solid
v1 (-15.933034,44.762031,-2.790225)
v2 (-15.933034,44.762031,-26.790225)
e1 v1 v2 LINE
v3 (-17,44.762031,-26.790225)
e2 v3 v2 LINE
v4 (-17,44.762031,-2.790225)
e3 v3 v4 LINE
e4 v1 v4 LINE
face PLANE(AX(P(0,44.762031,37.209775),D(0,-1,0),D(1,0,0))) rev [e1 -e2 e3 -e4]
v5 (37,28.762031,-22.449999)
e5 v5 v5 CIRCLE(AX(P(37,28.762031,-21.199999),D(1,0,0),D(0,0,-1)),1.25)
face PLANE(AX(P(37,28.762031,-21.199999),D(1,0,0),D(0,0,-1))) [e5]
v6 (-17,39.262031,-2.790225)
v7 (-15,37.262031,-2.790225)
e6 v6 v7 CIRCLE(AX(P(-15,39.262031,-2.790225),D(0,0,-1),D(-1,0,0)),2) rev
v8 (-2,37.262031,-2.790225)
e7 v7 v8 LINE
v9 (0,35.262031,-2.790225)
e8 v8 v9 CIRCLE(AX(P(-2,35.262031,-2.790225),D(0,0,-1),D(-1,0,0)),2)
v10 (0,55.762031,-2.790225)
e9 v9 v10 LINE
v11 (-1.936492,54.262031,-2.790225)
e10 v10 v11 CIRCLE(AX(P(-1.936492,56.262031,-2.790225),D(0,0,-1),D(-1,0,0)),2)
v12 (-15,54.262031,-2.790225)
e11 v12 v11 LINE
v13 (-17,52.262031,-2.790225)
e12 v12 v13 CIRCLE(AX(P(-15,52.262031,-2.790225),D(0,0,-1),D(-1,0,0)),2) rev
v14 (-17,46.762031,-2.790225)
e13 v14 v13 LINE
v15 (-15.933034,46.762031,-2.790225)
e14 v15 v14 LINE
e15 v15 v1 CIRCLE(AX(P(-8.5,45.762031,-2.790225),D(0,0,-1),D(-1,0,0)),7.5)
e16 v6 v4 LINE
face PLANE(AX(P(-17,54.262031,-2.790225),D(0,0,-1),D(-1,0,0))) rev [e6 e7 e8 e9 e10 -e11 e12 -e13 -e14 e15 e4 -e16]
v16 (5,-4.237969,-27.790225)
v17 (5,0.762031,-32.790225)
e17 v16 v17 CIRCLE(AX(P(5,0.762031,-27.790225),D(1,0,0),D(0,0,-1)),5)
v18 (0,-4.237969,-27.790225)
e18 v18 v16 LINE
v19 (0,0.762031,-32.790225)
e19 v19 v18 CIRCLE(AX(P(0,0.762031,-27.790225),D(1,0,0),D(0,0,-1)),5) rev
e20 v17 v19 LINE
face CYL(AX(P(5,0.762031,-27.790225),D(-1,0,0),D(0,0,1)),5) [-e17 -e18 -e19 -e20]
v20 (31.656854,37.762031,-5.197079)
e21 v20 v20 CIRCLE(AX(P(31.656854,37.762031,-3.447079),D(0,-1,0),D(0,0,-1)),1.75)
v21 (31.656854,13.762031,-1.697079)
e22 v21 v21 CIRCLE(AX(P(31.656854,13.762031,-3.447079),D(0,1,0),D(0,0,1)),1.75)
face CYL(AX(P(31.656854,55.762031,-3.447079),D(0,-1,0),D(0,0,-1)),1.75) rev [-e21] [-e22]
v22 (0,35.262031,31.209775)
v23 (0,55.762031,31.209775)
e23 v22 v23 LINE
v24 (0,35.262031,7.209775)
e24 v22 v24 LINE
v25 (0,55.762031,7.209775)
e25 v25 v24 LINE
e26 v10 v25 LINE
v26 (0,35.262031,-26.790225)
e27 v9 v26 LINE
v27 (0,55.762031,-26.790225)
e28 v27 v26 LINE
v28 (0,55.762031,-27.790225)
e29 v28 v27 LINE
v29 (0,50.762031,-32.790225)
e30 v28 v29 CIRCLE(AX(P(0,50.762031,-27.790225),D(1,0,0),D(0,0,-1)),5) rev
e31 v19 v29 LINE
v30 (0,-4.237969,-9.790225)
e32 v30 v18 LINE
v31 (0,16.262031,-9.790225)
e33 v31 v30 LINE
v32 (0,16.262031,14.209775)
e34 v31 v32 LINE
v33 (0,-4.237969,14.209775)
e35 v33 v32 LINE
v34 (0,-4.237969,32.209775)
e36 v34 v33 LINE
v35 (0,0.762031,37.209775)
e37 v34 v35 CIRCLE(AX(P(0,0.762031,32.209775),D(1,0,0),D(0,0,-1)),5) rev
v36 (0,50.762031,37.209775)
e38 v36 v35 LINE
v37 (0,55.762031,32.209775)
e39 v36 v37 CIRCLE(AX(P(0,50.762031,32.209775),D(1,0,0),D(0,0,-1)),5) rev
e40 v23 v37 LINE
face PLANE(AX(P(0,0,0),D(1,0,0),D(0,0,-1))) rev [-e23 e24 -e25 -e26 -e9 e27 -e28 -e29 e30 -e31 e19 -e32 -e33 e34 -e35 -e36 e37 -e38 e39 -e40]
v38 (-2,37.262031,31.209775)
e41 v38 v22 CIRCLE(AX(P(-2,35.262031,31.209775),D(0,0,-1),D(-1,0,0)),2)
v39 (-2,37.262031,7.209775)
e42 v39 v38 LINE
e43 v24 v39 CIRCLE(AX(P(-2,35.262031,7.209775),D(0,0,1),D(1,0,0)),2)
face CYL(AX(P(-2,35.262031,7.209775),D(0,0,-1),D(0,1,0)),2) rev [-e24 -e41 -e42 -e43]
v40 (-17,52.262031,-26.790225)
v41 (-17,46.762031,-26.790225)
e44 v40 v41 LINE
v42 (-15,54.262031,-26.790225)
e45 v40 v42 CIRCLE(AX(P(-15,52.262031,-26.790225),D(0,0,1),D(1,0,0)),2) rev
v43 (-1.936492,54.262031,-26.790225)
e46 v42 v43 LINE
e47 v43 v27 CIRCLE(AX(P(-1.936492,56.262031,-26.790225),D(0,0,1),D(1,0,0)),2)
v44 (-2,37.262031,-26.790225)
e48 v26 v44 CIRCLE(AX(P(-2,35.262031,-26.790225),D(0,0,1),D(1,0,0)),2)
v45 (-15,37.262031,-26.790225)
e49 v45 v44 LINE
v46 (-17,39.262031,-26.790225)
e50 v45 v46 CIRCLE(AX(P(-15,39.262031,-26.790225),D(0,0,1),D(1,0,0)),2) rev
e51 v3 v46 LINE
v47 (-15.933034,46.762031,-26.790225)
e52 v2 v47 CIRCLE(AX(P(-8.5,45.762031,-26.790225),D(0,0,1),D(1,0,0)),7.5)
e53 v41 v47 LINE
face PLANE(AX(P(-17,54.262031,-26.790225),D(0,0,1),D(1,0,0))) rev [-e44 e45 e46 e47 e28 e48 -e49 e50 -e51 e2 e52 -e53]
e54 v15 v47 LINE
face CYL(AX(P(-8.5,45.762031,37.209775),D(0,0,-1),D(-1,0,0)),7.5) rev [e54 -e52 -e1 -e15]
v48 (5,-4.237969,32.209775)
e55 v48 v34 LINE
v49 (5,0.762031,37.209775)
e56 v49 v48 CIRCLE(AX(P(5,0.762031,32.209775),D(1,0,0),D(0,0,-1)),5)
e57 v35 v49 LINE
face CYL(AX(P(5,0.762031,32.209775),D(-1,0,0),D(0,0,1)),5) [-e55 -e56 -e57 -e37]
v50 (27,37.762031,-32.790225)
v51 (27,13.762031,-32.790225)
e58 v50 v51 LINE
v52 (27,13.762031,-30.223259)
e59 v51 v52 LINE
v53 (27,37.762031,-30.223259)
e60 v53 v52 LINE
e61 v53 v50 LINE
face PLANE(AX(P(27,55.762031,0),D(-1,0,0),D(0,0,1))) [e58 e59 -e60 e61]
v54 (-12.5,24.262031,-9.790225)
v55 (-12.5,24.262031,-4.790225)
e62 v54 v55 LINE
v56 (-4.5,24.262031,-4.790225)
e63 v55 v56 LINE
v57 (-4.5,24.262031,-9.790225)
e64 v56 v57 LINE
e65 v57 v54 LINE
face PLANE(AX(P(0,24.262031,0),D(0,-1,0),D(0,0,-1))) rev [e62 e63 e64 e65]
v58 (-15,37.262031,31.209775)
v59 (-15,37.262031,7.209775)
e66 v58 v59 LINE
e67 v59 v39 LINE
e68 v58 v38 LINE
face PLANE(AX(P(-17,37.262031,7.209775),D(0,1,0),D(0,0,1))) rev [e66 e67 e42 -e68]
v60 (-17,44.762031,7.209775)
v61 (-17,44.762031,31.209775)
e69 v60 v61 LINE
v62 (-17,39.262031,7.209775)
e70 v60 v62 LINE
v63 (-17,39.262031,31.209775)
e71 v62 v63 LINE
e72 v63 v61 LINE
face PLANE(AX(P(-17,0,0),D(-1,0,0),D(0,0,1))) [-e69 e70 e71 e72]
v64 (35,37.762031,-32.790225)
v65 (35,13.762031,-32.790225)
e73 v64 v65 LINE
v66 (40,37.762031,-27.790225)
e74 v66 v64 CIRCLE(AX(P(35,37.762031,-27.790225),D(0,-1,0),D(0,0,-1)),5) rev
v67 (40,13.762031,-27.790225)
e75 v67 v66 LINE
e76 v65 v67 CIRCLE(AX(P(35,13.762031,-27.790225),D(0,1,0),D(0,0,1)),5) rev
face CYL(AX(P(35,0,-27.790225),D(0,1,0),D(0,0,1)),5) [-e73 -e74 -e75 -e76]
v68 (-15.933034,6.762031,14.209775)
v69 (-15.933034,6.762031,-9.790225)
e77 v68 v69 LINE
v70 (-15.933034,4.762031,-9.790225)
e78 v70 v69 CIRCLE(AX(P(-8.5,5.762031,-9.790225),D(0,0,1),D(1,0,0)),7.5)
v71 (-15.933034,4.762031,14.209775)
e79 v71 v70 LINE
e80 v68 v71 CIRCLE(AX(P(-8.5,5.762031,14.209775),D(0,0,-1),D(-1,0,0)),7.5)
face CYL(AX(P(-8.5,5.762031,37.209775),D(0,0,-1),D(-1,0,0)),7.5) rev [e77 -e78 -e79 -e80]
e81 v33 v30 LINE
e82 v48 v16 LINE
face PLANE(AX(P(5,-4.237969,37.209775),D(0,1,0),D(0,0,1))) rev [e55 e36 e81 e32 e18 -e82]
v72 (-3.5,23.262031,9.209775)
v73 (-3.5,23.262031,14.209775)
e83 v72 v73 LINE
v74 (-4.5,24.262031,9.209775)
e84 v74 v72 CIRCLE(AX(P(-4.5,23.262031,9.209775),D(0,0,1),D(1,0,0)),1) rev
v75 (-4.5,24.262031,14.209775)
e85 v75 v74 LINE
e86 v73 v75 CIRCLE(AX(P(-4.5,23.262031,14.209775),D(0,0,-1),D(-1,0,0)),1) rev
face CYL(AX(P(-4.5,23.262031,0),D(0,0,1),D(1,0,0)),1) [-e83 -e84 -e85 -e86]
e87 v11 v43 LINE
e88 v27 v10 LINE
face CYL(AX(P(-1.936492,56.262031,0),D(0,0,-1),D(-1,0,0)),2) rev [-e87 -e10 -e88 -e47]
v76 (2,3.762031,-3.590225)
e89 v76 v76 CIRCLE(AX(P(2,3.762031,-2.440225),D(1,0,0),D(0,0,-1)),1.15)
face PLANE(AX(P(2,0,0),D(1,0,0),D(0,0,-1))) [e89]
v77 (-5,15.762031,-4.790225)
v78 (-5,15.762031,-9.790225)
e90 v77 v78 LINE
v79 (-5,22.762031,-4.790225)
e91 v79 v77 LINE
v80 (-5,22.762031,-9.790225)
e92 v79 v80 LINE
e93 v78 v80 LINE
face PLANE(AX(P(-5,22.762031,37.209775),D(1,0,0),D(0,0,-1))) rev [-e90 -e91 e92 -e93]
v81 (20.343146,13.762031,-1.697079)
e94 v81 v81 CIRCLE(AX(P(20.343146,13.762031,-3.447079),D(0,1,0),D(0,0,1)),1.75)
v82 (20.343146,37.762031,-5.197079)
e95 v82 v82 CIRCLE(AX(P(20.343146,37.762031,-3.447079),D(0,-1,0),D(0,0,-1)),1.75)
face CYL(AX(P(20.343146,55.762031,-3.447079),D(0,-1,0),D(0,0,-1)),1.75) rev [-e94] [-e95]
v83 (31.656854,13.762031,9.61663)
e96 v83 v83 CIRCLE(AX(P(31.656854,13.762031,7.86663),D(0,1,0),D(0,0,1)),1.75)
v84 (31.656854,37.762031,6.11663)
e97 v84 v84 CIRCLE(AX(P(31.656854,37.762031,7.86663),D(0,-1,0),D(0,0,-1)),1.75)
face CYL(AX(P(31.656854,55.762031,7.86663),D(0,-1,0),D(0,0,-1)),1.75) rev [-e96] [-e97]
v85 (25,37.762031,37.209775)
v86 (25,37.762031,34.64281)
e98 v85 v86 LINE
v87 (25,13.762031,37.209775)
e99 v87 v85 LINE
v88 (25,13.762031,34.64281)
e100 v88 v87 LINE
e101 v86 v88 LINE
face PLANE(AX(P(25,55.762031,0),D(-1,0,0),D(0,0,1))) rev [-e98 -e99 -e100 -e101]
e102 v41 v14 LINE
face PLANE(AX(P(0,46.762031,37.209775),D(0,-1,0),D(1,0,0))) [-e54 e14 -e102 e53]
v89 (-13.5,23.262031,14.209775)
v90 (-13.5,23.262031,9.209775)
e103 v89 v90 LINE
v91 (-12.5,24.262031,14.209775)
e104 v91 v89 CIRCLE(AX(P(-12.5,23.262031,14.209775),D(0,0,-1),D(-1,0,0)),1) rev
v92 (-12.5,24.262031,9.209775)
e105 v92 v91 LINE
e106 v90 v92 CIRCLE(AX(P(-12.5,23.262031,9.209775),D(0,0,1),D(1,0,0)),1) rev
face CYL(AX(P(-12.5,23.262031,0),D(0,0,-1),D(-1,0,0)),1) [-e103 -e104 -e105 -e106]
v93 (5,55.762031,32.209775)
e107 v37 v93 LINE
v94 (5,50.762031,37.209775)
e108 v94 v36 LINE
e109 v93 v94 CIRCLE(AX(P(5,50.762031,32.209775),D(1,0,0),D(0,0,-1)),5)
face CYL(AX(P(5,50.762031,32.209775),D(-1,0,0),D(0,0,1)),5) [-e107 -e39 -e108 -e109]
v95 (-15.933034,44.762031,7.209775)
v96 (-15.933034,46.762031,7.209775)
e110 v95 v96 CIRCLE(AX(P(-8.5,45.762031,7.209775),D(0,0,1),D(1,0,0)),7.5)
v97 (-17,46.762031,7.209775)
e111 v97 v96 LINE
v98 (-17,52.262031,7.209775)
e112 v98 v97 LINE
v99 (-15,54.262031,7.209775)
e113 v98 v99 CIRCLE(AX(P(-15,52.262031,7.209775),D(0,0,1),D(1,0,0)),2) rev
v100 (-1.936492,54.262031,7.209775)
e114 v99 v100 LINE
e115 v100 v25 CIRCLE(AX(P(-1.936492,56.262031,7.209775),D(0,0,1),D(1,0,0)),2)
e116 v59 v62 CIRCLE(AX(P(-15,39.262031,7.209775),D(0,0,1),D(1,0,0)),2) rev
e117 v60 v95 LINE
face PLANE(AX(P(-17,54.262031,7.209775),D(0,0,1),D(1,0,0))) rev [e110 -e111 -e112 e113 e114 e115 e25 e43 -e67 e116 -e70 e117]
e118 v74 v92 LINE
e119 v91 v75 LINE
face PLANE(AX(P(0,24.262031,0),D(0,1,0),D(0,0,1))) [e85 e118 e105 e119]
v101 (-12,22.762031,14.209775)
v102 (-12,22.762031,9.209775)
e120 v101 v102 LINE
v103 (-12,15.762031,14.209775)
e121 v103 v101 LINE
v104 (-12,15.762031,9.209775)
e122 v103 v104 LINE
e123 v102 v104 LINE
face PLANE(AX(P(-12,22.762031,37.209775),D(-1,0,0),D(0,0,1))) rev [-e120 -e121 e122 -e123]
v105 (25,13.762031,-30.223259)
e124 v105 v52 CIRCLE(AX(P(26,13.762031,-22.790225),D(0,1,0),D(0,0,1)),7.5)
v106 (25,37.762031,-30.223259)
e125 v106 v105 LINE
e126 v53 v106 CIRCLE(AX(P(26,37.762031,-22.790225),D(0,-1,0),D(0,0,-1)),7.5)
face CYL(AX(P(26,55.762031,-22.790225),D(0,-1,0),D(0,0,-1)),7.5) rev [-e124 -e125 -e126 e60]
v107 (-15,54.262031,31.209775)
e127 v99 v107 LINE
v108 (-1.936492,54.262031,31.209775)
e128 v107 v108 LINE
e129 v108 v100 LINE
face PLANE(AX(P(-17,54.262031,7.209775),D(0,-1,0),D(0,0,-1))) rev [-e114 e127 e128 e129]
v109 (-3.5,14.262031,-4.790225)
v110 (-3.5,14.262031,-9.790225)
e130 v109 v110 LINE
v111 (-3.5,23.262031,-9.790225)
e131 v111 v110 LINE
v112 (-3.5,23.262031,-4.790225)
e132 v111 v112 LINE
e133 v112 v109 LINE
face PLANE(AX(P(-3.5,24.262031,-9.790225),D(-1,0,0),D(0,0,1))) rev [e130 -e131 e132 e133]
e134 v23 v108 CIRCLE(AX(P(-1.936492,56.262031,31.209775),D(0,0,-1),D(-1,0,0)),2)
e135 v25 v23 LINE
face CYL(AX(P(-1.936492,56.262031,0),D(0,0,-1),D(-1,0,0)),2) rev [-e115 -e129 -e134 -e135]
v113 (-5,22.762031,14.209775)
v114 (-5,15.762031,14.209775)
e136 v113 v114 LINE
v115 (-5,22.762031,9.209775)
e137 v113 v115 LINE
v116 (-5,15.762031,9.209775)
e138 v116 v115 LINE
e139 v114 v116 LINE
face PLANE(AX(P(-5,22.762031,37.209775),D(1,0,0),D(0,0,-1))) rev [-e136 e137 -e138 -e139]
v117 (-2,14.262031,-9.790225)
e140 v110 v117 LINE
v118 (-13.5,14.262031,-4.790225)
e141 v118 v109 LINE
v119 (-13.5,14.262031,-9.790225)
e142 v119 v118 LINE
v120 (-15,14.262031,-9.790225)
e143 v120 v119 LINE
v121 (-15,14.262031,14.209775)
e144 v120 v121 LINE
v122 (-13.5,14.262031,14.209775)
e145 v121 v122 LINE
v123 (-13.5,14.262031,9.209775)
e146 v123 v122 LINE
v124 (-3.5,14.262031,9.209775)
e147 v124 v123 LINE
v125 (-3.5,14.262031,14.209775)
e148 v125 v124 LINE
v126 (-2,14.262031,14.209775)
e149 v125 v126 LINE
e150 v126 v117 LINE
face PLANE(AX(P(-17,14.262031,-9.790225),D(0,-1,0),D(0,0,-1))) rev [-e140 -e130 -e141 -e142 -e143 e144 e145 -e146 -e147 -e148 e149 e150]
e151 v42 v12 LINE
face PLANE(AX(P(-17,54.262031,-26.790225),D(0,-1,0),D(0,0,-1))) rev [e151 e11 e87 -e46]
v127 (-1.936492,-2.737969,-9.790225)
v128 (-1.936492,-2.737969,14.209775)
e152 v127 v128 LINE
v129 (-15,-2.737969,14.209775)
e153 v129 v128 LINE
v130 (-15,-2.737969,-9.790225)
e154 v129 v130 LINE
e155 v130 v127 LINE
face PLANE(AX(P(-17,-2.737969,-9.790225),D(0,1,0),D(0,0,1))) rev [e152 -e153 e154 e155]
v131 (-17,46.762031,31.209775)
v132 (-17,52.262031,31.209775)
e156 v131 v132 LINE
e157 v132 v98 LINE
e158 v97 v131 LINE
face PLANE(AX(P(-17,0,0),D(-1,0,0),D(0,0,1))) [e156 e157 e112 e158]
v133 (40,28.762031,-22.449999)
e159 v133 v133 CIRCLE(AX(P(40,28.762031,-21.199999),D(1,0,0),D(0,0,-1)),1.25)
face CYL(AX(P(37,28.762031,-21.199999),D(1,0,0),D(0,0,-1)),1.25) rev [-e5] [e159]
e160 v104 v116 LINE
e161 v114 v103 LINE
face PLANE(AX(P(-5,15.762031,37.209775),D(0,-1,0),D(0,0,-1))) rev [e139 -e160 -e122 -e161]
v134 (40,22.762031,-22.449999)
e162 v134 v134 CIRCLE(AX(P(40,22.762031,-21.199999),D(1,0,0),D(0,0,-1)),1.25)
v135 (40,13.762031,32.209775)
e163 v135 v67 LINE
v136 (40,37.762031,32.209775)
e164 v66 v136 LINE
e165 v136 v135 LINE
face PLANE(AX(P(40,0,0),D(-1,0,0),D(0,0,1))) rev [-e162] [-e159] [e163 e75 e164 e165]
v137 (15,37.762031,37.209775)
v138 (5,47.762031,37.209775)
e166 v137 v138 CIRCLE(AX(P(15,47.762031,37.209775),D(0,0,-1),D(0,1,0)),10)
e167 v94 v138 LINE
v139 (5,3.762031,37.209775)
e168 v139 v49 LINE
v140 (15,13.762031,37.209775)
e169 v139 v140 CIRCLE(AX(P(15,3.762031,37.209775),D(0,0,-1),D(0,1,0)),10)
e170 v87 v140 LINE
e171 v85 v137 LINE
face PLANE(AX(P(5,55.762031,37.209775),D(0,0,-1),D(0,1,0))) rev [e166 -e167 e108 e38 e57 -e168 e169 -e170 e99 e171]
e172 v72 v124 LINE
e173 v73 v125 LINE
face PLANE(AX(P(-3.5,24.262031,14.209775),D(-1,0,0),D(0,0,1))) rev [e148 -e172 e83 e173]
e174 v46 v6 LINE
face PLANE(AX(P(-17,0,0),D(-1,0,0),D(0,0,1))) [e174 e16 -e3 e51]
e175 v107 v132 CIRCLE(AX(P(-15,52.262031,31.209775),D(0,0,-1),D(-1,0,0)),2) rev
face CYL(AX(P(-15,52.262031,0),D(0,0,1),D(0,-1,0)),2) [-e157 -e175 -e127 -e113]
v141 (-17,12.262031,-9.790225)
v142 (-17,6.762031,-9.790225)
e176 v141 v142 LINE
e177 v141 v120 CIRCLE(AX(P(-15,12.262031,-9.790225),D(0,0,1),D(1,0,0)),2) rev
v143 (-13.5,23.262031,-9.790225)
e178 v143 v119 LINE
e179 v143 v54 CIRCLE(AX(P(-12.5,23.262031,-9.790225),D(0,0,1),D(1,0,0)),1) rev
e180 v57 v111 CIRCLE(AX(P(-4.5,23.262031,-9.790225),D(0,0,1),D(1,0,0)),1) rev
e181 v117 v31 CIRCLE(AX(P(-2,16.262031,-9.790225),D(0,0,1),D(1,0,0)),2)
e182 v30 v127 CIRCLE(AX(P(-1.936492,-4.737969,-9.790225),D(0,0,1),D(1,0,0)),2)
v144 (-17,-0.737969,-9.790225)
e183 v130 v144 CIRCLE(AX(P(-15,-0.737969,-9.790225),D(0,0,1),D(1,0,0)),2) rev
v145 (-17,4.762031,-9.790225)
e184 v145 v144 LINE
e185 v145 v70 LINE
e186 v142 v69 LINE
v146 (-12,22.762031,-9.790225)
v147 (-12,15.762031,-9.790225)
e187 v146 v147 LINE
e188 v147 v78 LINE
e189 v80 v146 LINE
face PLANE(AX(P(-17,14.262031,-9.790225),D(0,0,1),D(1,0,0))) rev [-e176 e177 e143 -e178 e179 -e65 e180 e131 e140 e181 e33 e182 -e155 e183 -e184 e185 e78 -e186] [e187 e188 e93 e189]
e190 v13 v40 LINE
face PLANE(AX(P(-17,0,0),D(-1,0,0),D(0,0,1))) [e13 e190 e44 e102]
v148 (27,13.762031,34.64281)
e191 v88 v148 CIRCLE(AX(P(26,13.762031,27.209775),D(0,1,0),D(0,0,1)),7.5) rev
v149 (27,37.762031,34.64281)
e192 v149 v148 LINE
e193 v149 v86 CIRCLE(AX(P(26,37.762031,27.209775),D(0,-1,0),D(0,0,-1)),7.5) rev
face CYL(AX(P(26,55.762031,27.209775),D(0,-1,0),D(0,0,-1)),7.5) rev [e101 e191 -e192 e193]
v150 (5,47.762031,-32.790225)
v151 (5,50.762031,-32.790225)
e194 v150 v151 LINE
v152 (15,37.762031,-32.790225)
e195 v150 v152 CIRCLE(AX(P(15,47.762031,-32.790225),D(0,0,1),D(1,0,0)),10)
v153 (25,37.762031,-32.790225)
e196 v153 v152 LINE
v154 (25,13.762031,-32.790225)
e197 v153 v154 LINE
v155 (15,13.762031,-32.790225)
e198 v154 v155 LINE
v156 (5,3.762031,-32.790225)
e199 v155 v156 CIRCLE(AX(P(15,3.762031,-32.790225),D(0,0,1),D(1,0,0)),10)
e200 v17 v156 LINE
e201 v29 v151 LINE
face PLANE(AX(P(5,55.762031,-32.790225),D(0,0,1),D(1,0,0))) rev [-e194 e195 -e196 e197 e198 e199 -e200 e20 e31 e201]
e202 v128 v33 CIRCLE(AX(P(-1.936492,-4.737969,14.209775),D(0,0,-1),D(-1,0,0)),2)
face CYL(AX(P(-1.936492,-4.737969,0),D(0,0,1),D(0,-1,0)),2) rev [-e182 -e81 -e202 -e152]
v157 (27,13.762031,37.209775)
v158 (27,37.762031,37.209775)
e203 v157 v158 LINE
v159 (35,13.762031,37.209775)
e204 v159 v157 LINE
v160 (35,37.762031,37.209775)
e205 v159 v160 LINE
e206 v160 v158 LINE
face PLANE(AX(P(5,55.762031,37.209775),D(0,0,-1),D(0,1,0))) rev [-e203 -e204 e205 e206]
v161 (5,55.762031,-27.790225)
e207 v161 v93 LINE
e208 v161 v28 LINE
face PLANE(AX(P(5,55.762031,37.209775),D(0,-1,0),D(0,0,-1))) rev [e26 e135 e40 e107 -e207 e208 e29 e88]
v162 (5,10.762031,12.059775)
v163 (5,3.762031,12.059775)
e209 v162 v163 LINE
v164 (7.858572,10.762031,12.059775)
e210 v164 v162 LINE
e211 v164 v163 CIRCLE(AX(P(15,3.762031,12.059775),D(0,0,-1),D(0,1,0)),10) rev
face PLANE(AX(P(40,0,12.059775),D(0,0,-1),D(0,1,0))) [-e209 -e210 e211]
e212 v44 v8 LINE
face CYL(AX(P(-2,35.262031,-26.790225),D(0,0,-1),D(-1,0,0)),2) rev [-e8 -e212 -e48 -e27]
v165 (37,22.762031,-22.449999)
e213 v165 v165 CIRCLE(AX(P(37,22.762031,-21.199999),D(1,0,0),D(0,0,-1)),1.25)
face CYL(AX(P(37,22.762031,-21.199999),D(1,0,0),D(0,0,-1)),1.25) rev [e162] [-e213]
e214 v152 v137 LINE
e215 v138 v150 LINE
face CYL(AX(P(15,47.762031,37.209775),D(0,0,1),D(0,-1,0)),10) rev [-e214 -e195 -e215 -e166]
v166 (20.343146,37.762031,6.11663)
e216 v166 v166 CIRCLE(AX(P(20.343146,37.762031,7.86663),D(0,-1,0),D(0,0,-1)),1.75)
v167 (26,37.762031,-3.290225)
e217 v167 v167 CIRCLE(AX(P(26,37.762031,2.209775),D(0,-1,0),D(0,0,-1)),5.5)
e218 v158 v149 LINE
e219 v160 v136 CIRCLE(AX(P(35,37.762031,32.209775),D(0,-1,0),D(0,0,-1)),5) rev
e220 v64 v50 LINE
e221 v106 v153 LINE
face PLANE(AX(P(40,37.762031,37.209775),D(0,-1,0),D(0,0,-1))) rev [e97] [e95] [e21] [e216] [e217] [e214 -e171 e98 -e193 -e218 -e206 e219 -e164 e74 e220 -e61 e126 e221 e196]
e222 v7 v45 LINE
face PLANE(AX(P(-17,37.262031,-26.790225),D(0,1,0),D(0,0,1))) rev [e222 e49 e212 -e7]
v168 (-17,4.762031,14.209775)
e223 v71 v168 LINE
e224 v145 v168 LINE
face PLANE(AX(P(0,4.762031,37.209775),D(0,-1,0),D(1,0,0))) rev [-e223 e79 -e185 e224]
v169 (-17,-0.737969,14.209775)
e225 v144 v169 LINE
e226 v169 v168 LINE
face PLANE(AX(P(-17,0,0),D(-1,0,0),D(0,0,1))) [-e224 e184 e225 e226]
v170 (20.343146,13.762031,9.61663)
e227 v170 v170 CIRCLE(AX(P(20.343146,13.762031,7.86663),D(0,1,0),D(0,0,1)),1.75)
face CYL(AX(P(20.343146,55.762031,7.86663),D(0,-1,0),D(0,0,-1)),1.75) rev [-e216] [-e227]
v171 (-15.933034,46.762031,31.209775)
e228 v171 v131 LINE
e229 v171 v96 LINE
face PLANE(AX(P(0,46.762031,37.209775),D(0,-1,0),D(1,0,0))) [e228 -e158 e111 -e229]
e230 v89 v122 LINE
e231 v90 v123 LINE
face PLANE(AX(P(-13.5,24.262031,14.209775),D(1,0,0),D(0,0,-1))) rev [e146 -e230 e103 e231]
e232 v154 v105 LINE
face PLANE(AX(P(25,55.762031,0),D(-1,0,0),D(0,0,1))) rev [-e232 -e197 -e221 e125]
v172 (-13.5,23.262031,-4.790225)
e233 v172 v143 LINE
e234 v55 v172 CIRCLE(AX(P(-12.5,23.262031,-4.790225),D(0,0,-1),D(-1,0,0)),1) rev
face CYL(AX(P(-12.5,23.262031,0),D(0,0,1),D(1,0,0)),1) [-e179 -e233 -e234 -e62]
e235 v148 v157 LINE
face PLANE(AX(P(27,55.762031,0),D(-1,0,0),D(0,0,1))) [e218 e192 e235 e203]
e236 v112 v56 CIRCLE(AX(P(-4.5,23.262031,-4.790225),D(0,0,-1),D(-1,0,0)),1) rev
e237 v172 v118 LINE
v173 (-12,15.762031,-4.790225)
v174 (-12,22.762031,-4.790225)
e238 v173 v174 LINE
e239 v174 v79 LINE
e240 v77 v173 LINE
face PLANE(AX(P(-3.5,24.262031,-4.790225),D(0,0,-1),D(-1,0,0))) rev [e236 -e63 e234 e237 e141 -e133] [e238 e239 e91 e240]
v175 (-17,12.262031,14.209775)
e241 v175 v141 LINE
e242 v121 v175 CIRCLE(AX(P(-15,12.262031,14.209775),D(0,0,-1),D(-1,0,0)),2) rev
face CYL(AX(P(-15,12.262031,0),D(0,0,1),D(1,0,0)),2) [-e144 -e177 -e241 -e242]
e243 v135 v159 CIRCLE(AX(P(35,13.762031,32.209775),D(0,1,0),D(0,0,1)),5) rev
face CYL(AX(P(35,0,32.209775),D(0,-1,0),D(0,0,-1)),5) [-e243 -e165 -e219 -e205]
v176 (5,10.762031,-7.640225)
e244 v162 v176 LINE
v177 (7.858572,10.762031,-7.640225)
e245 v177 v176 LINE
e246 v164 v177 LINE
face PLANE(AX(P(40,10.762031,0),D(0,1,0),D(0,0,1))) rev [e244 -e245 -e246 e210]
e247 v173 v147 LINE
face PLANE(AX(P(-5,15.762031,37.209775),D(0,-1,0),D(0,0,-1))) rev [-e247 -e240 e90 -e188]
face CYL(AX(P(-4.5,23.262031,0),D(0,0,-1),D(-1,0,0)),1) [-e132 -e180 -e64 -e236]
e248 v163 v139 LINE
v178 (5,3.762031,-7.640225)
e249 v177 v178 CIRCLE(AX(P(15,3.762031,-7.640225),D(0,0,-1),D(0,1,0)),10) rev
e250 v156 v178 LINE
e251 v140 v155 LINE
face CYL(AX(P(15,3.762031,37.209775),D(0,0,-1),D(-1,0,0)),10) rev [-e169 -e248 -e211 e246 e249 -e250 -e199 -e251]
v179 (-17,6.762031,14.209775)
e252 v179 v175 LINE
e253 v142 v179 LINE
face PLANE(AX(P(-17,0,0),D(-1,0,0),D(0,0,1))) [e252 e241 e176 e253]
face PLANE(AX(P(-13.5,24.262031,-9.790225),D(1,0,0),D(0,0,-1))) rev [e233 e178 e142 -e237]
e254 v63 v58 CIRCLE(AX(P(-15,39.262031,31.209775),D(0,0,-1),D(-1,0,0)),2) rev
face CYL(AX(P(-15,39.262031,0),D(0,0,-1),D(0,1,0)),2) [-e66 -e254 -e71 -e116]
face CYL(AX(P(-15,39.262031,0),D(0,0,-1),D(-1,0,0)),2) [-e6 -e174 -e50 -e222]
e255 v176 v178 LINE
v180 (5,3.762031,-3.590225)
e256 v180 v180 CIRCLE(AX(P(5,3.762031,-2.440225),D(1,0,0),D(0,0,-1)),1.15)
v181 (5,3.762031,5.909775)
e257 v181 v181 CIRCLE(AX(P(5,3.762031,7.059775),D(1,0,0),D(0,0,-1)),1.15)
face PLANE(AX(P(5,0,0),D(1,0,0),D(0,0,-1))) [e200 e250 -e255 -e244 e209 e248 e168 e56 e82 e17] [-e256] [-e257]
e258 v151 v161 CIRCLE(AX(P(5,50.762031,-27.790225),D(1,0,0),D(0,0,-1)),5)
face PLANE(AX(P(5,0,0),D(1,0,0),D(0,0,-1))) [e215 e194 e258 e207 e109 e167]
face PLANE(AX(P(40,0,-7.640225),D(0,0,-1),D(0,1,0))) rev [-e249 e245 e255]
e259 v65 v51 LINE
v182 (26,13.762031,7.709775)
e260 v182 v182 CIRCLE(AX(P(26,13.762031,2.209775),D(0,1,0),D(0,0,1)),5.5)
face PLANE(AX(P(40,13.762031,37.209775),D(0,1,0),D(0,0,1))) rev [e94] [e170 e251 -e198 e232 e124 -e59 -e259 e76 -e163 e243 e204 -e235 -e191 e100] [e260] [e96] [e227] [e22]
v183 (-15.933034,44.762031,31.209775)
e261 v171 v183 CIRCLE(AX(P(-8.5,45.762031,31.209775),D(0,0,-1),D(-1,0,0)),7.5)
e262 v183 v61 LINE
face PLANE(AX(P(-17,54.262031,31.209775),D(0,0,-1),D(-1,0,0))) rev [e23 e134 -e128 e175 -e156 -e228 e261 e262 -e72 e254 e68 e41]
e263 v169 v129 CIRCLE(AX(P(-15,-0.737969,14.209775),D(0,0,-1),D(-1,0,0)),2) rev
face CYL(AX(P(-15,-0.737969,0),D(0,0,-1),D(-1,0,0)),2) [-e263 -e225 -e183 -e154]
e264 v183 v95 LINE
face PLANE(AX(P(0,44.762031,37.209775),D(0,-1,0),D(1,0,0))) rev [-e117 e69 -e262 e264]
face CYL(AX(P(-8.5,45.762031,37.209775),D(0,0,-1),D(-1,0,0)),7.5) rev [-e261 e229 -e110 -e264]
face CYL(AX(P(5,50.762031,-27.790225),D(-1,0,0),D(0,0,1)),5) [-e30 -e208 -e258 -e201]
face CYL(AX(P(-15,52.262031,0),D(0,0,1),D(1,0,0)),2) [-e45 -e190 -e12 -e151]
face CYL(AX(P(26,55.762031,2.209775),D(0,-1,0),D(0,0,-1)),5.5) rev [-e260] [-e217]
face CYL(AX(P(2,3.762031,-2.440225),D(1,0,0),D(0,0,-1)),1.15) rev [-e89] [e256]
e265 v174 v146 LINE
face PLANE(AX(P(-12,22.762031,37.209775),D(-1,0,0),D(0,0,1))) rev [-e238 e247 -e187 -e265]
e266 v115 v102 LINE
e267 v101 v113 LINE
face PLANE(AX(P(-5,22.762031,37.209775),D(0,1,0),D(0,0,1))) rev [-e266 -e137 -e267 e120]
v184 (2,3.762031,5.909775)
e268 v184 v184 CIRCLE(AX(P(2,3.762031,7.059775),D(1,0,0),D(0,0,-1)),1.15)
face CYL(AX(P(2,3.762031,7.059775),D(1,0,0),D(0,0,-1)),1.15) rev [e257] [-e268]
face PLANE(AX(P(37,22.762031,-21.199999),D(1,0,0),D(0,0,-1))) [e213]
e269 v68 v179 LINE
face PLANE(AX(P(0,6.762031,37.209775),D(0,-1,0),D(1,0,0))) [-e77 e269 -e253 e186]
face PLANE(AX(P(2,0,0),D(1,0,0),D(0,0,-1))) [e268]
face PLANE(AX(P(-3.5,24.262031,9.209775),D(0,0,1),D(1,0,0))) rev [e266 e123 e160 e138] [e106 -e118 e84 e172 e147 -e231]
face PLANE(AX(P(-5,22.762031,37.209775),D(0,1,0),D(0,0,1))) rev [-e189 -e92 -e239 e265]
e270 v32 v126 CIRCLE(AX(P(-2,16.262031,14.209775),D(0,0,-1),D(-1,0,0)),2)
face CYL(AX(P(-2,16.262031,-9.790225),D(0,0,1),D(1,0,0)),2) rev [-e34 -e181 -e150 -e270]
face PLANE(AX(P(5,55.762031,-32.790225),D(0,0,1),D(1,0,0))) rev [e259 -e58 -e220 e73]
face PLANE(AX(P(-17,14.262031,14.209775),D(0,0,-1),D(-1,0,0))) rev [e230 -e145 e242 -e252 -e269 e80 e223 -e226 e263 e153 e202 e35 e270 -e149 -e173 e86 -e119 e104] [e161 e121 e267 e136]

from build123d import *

# Parameters (mm, degrees)
SKETCH1_W               = 70
SKETCH1_H               = 60
BOSS_EXTRUDE3_DEPTH     = 5
FILLET2_R               = 5
SKETCH4_W               = 70
SKETCH4_H               = 24
BOSS_EXTRUDE5_DEPTH     = 35
FILLET4_R               = 5
CUT_EXTRUDE2_DEPTH      = 69.90984967
CUT_EXTRUDE2_DEPTH_BACK = 69.90984967
SKETCH5_R               = 7.5
SKETCH5_R_2             = 1.75
SKETCH5_R_3             = 5.5
SKETCH5_W               = 2
SKETCH5_H               = 4.51340439
SKETCH5_H_2             = 4.308458094
FILLET5_R               = 10
SKETCH6_W               = 24
SKETCH6_H               = 17
BOSS_EXTRUDE6_DEPTH     = 17
CUT_EXTRUDE3_DEPTH      = 94.837114918
CUT_EXTRUDE3_DEPTH_BACK = 94.837114918
SKETCH7_W               = 1.676391699
SKETCH7_H               = 2
FILLET6_R               = 2
SKETCH8_W               = 10
SKETCH8_H               = 5
BOSS_EXTRUDE7_DEPTH     = 10
CUT_EXTRUDE4_DEPTH      = 84.176944739
CUT_EXTRUDE4_DEPTH_BACK = 84.176944739
SKETCH9_W               = 7
SKETCH9_H               = 7
FILLET7_R               = 1
CUT_EXTRUDE5_DEPTH      = 76.623881926
CUT_EXTRUDE6_DEPTH      = 3
SKETCH11_R              = 1.25
CUT_EXTRUDE7_DEPTH      = 3


with BuildPart() as part:
    # Sketch1 → Boss-Extrude3 (new body)
    with BuildSketch(Plane(origin=(0, 0, 0), x_dir=(0, 0, -1), z_dir=(1, 0, 0))):
        with Locations((-2.209775349, 25.762031313)):
            Rectangle(SKETCH1_W, SKETCH1_H)
    extrude(amount=BOSS_EXTRUDE3_DEPTH)

    # Fillet2
    fillet2_edges = [part.edges().sort_by_distance(p)[0] for p in [
        (2.5, 55.762031313, 37.209775349),
        (2.5, 55.762031313, -32.790224651),
        (2.5, -4.237968687, -32.790224651),
        (2.5, -4.237968687, 37.209775349),
    ]]
    fillet(fillet2_edges, radius=FILLET2_R)

    # Sketch4 → Boss-Extrude5 (add)
    with BuildSketch(Plane(origin=(5, 0, 0), x_dir=(0, 0, -1), z_dir=(1, 0, 0))):
        with Locations((-2.209775349, 25.762031313)):
            Rectangle(SKETCH4_W, SKETCH4_H)
    extrude(amount=BOSS_EXTRUDE5_DEPTH)

    # Fillet4
    fillet4_edges = [part.edges().sort_by_distance(p)[0] for p in [
        (40, 25.762031313, 37.209775349),
        (40, 25.762031313, -32.790224651),
    ]]
    fillet(fillet4_edges, radius=FILLET4_R)

    # Sketch5 → Cut-Extrude2 (cut, two sides: drawn at the far end of the back side and taken through both)
    with BuildSketch(Plane(origin=(0, 13.762031313, 0), x_dir=(-1, 0, 0), z_dir=(0, -1, 0)).offset(-CUT_EXTRUDE2_DEPTH_BACK)):
        with Locations((-26, -27.209775349)):
            Circle(SKETCH5_R)
        with Locations((-26, 22.790224651)):
            Circle(SKETCH5_R)
        with Locations(Location((-31.656854249, -7.866629598, 0), (0, 0, 90))):
            Circle(SKETCH5_R_2)
        with Locations(Location((-31.656854249, 3.447078901, 0), (0, 0, 90))):
            Circle(SKETCH5_R_2)
        with Locations(Location((-20.343145751, 3.447078901, 0), (0, 0, 90))):
            Circle(SKETCH5_R_2)
        with Locations(Location((-20.343145751, -7.866629598, 0), (0, 0, 90))):
            Circle(SKETCH5_R_2)
        with Locations(Location((-26, -2.209775349, 0), (0, 0, 90))):
            Circle(SKETCH5_R_3)
        with BuildLine():
            Line((-27, 30.223259025), (-27, 27.895040572))
            Line((-27, 27.895040572), (-25, 27.895040572))
            Line((-25, 27.895040572), (-25, 30.223259025))
            ThreePointArc((-25, 30.223259025), (-26, 30.290224651), (-27, 30.223259025))
        make_face()
        with BuildLine():
            Line((-25, 27.895040572), (-27, 27.895040572))
            Line((-27, 27.895040572), (-27, 30.223259025))
            ThreePointArc((-27, 30.223259025), (-30.937104415, 17.144429756), (-18.5, 22.790224651))
            ThreePointArc((-18.5, 22.790224651), (-20.354205105, 27.727329066), (-25, 30.223259025))
            Line((-25, 30.223259025), (-25, 27.895040572))
        make_face()
        with BuildLine():
            Line((-27, 32.790224651), (-27, 30.223259025))
            ThreePointArc((-27, 30.223259025), (-26, 30.290224651), (-25, 30.223259025))
            Line((-25, 30.223259025), (-25, 32.790224651))
            Line((-25, 32.790224651), (-27, 32.790224651))
        make_face()
        with Locations((-26, 35.046926846)):
            Rectangle(SKETCH5_W, SKETCH5_H)
        with BuildLine():
            ThreePointArc((-18.5, -27.209775349), (-30.937104415, -21.563980453), (-27, -34.642809722))
            Line((-27, -34.642809722), (-27, -32.579541542))
            Line((-27, -32.579541542), (-25, -32.579541542))
            Line((-25, -32.579541542), (-25, -34.642809722))
            ThreePointArc((-25, -34.642809722), (-20.354205105, -32.146879763), (-18.5, -27.209775349))
        make_face()
        with BuildLine():
            Line((-27, -32.579541542), (-27, -34.642809722))
            ThreePointArc((-27, -34.642809722), (-26, -34.709775349), (-25, -34.642809722))
            Line((-25, -34.642809722), (-25, -32.579541542))
            Line((-25, -32.579541542), (-27, -32.579541542))
        make_face()
        with BuildLine():
            Line((-27, -34.642809722), (-27, -37.209775349))
            Line((-27, -37.209775349), (-25, -37.209775349))
            Line((-25, -37.209775349), (-25, -34.642809722))
            ThreePointArc((-25, -34.642809722), (-26, -34.709775349), (-27, -34.642809722))
        make_face()
        with Locations((-26, -39.364004396)):
            Rectangle(SKETCH5_W, SKETCH5_H_2)
    extrude(amount=CUT_EXTRUDE2_DEPTH + CUT_EXTRUDE2_DEPTH_BACK, mode=Mode.SUBTRACT)

    # Fillet5
    fillet5_edges = [part.edges().sort_by_distance(p)[0] for p in [
        (5, 13.762031313, 2.209775349),
        (5, 37.762031313, 2.209775349),
    ]]
    fillet(fillet5_edges, radius=FILLET5_R)

    # Sketch6 → Boss-Extrude6 (add)
    with BuildSketch(Plane.ZY):
        with Locations((2.209775349, 5.762031313)):
            Rectangle(SKETCH6_W, SKETCH6_H)
        with Locations((-14.790224651, 45.762031313)):
            Rectangle(SKETCH6_W, SKETCH6_H)
        with Locations((19.209775349, 45.762031313)):
            Rectangle(SKETCH6_W, SKETCH6_H)
    extrude(amount=BOSS_EXTRUDE6_DEPTH)

    # Sketch7 → Cut-Extrude3 (cut, two sides: drawn at the far end of the back side and taken through both)
    with BuildSketch(Plane(origin=(0, 0, -26.790224651), x_dir=(-1, 0, 0), z_dir=(0, 0, -1)).offset(-CUT_EXTRUDE3_DEPTH_BACK)):
        with BuildLine():
            Line((14.708330611, 44.762031313), (14.708330611, 46.762031313))
            Line((14.708330611, 46.762031313), (15.933034374, 46.762031313))
            ThreePointArc((15.933034374, 46.762031313), (1, 45.762031313), (15.933034374, 44.762031313))
            Line((15.933034374, 44.762031313), (14.708330611, 44.762031313))
        make_face()
        with BuildLine():
            Line((15.933034374, 46.762031313), (14.708330611, 46.762031313))
            Line((14.708330611, 46.762031313), (14.708330611, 44.762031313))
            Line((14.708330611, 44.762031313), (15.933034374, 44.762031313))
            ThreePointArc((15.933034374, 44.762031313), (15.983239867, 45.260911468), (16, 45.762031313))
            ThreePointArc((16, 45.762031313), (15.983239867, 46.263151157), (15.933034374, 46.762031313))
        make_face()
        with BuildLine():
            Line((17, 46.762031313), (15.933034374, 46.762031313))
            ThreePointArc((15.933034374, 46.762031313), (15.983239867, 46.263151157), (16, 45.762031313))
            ThreePointArc((16, 45.762031313), (15.983239867, 45.260911468), (15.933034374, 44.762031313))
            Line((15.933034374, 44.762031313), (17, 44.762031313))
            Line((17, 44.762031313), (17, 46.762031313))
        make_face()
        with Locations((17.838195849, 45.762031313)):
            Rectangle(SKETCH7_W, SKETCH7_H)
        with BuildLine():
            Line((14.795029653, 4.762031313), (14.795029653, 6.762031313))
            Line((14.795029653, 6.762031313), (15.933034374, 6.762031313))
            ThreePointArc((15.933034374, 6.762031313), (1, 5.762031313), (15.933034374, 4.762031313))
            Line((15.933034374, 4.762031313), (14.795029653, 4.762031313))
        make_face()
        with BuildLine():
            Line((15.933034374, 6.762031313), (14.795029653, 6.762031313))
            Line((14.795029653, 6.762031313), (14.795029653, 4.762031313))
            Line((14.795029653, 4.762031313), (15.933034374, 4.762031313))
            ThreePointArc((15.933034374, 4.762031313), (15.983239867, 5.260911468), (16, 5.762031313))
            ThreePointArc((16, 5.762031313), (15.983239867, 6.263151157), (15.933034374, 6.762031313))
        make_face()
        with BuildLine():
            Line((19.308722913, 6.762031313), (15.933034374, 6.762031313))
            ThreePointArc((15.933034374, 6.762031313), (15.983239867, 6.263151157), (16, 5.762031313))
            ThreePointArc((16, 5.762031313), (15.983239867, 5.260911468), (15.933034374, 4.762031313))
            Line((15.933034374, 4.762031313), (19.308722913, 4.762031313))
            Line((19.308722913, 4.762031313), (19.308722913, 6.762031313))
        make_face()
    extrude(amount=CUT_EXTRUDE3_DEPTH + CUT_EXTRUDE3_DEPTH_BACK, mode=Mode.SUBTRACT)

    # Fillet6
    # the kernel refuses this fillet: 2 mm, written as the material it adds along each edge
    with BuildSketch(Plane(origin=(0, 37.262031313, -2.790224651), x_dir=(0, -1, 0), z_dir=(0, 0, -1)), Plane(origin=(0, 14.262031313, -9.790224651), x_dir=(0, 1, 0), z_dir=(0, 0, 1)), Plane(origin=(0, 37.262031313, 31.209775349), x_dir=(0, -1, 0), z_dir=(0, 0, -1))) as fillet6_piece_1:
        with BuildLine():
            CenterArc((FILLET6_R, FILLET6_R), FILLET6_R, 180, 90)
            Line((0, FILLET6_R), (0, 0))
            Line((0, 0), (FILLET6_R, 0))
        make_face()
    extrude(amount=24)
    with BuildSketch(Plane(origin=(0, 54.262031313, -26.790224651), x_dir=(0, 1, 0), z_dir=(0, 0, 1)), Plane(origin=(0, -2.737968687, 14.209775349), x_dir=(0, -1, 0), z_dir=(0, 0, -1)), Plane(origin=(0, 54.262031313, 7.209775349), x_dir=(0, 1, 0), z_dir=(0, 0, 1))) as fillet6_piece_2:
        with BuildLine():
            CenterArc((2, 1.936491673), FILLET6_R, 180, 75.522487814)
            Line((0, 1.936491673), (0, 0))
            Line((0, 0), (1.5, 0))
        make_face()
    extrude(amount=24)
    # the kernel refuses this fillet: 2 mm, written as the material it takes off along each edge
    with BuildSketch(Plane(origin=(-17, 37.262031313, 2.209775349), x_dir=(0, 1, 0), z_dir=(0, 0, -1)), Plane(origin=(-17, 54.262031313, -31.790224651), x_dir=(0, -1, 0), z_dir=(0, 0, 1)), Plane(origin=(-17, -2.737968687, 19.209775349), x_dir=(0, 1, 0), z_dir=(0, 0, -1)), Plane(origin=(-17, 14.262031313, -14.790224651), x_dir=(0, -1, 0), z_dir=(0, 0, 1)), Plane(origin=(-17, 37.262031313, 36.209775349), x_dir=(0, 1, 0), z_dir=(0, 0, -1)), Plane(origin=(-17, 54.262031313, 2.209775349), x_dir=(0, -1, 0), z_dir=(0, 0, 1))) as fillet6_2_piece_1:
        with BuildLine():
            CenterArc((FILLET6_R, FILLET6_R), FILLET6_R, 180, 90)
            Line((0, FILLET6_R), (0, 0))
            Line((0, 0), (FILLET6_R, 0))
        make_face()
    extrude(amount=34, mode=Mode.SUBTRACT)

    # Sketch8 → Boss-Extrude7 (add)
    with BuildSketch(Plane(origin=(0, 14.262031313, 0), x_dir=(1, 0, 0), z_dir=(0, 1, 0))):
        with Locations((-8.5, 7.290224651)):
            Rectangle(SKETCH8_W, SKETCH8_H)
        with Locations((-8.5, -11.709775349)):
            Rectangle(SKETCH8_W, SKETCH8_H)
    extrude(amount=BOSS_EXTRUDE7_DEPTH)

    # Sketch9 → Cut-Extrude4 (cut, two sides: drawn at the far end of the back side and taken through both)
    with BuildSketch(Plane(origin=(0, 0, -9.790224651), x_dir=(-1, 0, 0), z_dir=(0, 0, -1)).offset(-CUT_EXTRUDE4_DEPTH_BACK)):
        with Locations((8.5, 19.262031313)):
            Rectangle(SKETCH9_W, SKETCH9_H)
    extrude(amount=CUT_EXTRUDE4_DEPTH + CUT_EXTRUDE4_DEPTH_BACK, mode=Mode.SUBTRACT)

    # Fillet7
    fillet7_edges = [part.edges().sort_by_distance(p)[0] for p in [
        (-3.5, 24.262031313, -7.290224651),
        (-13.5, 24.262031313, -7.290224651),
        (-3.5, 24.262031313, 11.709775349),
        (-13.5, 24.262031313, 11.709775349),
    ]]
    fillet(fillet7_edges, radius=FILLET7_R)

    # Sketch10 → Cut-Extrude5 (cut, through all)
    with BuildSketch(Plane(origin=(5, 0, 0), x_dir=(0, 0, -1), z_dir=(1, 0, 0))):
        with BuildLine():
            Line((7.640224651, 10.762031313), (-12.059775349, 10.762031313))
            Line((-12.059775349, 10.762031313), (-12.059775349, 3.762031313))
            Line((-12.059775349, 3.762031313), (-8.209775349, 3.762031313))
            ThreePointArc((-8.209775349, 3.762031313), (-7.059775349, 4.912031313), (-5.909775349, 3.762031313))
            Line((-5.909775349, 3.762031313), (1.290224651, 3.762031313))
            ThreePointArc((1.290224651, 3.762031313), (2.440224651, 4.912031313), (3.590224651, 3.762031313))
            Line((3.590224651, 3.762031313), (7.640224651, 3.762031313))
            Line((7.640224651, 3.762031313), (7.640224651, 10.762031313))
        make_face()
        with BuildLine():
            Line((-8.209775349, 3.762031313), (-12.059775349, 3.762031313))
            Line((-12.059775349, 3.762031313), (-12.059775349, -4.237968687))
            Line((-12.059775349, -4.237968687), (7.640224651, -4.237968687))
            Line((7.640224651, -4.237968687), (7.640224651, 3.762031313))
            Line((7.640224651, 3.762031313), (3.590224651, 3.762031313))
            ThreePointArc((3.590224651, 3.762031313), (2.440224651, 2.612031313), (1.290224651, 3.762031313))
            Line((1.290224651, 3.762031313), (-5.909775349, 3.762031313))
            ThreePointArc((-5.909775349, 3.762031313), (-7.059775349, 2.612031313), (-8.209775349, 3.762031313))
        make_face()
        with BuildLine():
            Line((-5.909775349, 3.762031313), (-8.209775349, 3.762031313))
            ThreePointArc((-8.209775349, 3.762031313), (-7.059775349, 2.612031313), (-5.909775349, 3.762031313))
        make_face()
        with BuildLine():
            ThreePointArc((-5.909775349, 3.762031313), (-7.059775349, 4.912031313), (-8.209775349, 3.762031313))
            Line((-8.209775349, 3.762031313), (-5.909775349, 3.762031313))
        make_face()
        with BuildLine():
            Line((1.290224651, 3.762031313), (3.590224651, 3.762031313))
            ThreePointArc((3.590224651, 3.762031313), (2.440224651, 4.912031313), (1.290224651, 3.762031313))
        make_face()
        with BuildLine():
            ThreePointArc((1.290224651, 3.762031313), (2.440224651, 2.612031313), (3.590224651, 3.762031313))
            Line((3.590224651, 3.762031313), (1.290224651, 3.762031313))
        make_face()
    extrude(amount=CUT_EXTRUDE5_DEPTH, mode=Mode.SUBTRACT)

    # Sketch10<3> → Cut-Extrude6 (cut)
    with BuildSketch(Plane(origin=(5, 0, 0), x_dir=(0, 0, -1), z_dir=(1, 0, 0))):
        with BuildLine():
            Line((-5.909775349, 3.762031313), (-8.209775349, 3.762031313))
            ThreePointArc((-8.209775349, 3.762031313), (-7.059775349, 2.612031313), (-5.909775349, 3.762031313))
        make_face()
        with BuildLine():
            ThreePointArc((-5.909775349, 3.762031313), (-7.059775349, 4.912031313), (-8.209775349, 3.762031313))
            Line((-8.209775349, 3.762031313), (-5.909775349, 3.762031313))
        make_face()
        with BuildLine():
            Line((1.290224651, 3.762031313), (3.590224651, 3.762031313))
            ThreePointArc((3.590224651, 3.762031313), (2.440224651, 4.912031313), (1.290224651, 3.762031313))
        make_face()
        with BuildLine():
            ThreePointArc((1.290224651, 3.762031313), (2.440224651, 2.612031313), (3.590224651, 3.762031313))
            Line((3.590224651, 3.762031313), (1.290224651, 3.762031313))
        make_face()
    extrude(amount=-CUT_EXTRUDE6_DEPTH, mode=Mode.SUBTRACT)

    # Sketch11 → Cut-Extrude7 (cut)
    with BuildSketch(Plane(origin=(40, 0, 0), x_dir=(0, 0, -1), z_dir=(1, 0, 0))):
        with Locations((21.199998978, 28.762031313)):
            Circle(SKETCH11_R)
        with Locations((21.199998978, 22.762031313)):
            Circle(SKETCH11_R)
    extrude(amount=-CUT_EXTRUDE7_DEPTH, mode=Mode.SUBTRACT)


solid = part.part
